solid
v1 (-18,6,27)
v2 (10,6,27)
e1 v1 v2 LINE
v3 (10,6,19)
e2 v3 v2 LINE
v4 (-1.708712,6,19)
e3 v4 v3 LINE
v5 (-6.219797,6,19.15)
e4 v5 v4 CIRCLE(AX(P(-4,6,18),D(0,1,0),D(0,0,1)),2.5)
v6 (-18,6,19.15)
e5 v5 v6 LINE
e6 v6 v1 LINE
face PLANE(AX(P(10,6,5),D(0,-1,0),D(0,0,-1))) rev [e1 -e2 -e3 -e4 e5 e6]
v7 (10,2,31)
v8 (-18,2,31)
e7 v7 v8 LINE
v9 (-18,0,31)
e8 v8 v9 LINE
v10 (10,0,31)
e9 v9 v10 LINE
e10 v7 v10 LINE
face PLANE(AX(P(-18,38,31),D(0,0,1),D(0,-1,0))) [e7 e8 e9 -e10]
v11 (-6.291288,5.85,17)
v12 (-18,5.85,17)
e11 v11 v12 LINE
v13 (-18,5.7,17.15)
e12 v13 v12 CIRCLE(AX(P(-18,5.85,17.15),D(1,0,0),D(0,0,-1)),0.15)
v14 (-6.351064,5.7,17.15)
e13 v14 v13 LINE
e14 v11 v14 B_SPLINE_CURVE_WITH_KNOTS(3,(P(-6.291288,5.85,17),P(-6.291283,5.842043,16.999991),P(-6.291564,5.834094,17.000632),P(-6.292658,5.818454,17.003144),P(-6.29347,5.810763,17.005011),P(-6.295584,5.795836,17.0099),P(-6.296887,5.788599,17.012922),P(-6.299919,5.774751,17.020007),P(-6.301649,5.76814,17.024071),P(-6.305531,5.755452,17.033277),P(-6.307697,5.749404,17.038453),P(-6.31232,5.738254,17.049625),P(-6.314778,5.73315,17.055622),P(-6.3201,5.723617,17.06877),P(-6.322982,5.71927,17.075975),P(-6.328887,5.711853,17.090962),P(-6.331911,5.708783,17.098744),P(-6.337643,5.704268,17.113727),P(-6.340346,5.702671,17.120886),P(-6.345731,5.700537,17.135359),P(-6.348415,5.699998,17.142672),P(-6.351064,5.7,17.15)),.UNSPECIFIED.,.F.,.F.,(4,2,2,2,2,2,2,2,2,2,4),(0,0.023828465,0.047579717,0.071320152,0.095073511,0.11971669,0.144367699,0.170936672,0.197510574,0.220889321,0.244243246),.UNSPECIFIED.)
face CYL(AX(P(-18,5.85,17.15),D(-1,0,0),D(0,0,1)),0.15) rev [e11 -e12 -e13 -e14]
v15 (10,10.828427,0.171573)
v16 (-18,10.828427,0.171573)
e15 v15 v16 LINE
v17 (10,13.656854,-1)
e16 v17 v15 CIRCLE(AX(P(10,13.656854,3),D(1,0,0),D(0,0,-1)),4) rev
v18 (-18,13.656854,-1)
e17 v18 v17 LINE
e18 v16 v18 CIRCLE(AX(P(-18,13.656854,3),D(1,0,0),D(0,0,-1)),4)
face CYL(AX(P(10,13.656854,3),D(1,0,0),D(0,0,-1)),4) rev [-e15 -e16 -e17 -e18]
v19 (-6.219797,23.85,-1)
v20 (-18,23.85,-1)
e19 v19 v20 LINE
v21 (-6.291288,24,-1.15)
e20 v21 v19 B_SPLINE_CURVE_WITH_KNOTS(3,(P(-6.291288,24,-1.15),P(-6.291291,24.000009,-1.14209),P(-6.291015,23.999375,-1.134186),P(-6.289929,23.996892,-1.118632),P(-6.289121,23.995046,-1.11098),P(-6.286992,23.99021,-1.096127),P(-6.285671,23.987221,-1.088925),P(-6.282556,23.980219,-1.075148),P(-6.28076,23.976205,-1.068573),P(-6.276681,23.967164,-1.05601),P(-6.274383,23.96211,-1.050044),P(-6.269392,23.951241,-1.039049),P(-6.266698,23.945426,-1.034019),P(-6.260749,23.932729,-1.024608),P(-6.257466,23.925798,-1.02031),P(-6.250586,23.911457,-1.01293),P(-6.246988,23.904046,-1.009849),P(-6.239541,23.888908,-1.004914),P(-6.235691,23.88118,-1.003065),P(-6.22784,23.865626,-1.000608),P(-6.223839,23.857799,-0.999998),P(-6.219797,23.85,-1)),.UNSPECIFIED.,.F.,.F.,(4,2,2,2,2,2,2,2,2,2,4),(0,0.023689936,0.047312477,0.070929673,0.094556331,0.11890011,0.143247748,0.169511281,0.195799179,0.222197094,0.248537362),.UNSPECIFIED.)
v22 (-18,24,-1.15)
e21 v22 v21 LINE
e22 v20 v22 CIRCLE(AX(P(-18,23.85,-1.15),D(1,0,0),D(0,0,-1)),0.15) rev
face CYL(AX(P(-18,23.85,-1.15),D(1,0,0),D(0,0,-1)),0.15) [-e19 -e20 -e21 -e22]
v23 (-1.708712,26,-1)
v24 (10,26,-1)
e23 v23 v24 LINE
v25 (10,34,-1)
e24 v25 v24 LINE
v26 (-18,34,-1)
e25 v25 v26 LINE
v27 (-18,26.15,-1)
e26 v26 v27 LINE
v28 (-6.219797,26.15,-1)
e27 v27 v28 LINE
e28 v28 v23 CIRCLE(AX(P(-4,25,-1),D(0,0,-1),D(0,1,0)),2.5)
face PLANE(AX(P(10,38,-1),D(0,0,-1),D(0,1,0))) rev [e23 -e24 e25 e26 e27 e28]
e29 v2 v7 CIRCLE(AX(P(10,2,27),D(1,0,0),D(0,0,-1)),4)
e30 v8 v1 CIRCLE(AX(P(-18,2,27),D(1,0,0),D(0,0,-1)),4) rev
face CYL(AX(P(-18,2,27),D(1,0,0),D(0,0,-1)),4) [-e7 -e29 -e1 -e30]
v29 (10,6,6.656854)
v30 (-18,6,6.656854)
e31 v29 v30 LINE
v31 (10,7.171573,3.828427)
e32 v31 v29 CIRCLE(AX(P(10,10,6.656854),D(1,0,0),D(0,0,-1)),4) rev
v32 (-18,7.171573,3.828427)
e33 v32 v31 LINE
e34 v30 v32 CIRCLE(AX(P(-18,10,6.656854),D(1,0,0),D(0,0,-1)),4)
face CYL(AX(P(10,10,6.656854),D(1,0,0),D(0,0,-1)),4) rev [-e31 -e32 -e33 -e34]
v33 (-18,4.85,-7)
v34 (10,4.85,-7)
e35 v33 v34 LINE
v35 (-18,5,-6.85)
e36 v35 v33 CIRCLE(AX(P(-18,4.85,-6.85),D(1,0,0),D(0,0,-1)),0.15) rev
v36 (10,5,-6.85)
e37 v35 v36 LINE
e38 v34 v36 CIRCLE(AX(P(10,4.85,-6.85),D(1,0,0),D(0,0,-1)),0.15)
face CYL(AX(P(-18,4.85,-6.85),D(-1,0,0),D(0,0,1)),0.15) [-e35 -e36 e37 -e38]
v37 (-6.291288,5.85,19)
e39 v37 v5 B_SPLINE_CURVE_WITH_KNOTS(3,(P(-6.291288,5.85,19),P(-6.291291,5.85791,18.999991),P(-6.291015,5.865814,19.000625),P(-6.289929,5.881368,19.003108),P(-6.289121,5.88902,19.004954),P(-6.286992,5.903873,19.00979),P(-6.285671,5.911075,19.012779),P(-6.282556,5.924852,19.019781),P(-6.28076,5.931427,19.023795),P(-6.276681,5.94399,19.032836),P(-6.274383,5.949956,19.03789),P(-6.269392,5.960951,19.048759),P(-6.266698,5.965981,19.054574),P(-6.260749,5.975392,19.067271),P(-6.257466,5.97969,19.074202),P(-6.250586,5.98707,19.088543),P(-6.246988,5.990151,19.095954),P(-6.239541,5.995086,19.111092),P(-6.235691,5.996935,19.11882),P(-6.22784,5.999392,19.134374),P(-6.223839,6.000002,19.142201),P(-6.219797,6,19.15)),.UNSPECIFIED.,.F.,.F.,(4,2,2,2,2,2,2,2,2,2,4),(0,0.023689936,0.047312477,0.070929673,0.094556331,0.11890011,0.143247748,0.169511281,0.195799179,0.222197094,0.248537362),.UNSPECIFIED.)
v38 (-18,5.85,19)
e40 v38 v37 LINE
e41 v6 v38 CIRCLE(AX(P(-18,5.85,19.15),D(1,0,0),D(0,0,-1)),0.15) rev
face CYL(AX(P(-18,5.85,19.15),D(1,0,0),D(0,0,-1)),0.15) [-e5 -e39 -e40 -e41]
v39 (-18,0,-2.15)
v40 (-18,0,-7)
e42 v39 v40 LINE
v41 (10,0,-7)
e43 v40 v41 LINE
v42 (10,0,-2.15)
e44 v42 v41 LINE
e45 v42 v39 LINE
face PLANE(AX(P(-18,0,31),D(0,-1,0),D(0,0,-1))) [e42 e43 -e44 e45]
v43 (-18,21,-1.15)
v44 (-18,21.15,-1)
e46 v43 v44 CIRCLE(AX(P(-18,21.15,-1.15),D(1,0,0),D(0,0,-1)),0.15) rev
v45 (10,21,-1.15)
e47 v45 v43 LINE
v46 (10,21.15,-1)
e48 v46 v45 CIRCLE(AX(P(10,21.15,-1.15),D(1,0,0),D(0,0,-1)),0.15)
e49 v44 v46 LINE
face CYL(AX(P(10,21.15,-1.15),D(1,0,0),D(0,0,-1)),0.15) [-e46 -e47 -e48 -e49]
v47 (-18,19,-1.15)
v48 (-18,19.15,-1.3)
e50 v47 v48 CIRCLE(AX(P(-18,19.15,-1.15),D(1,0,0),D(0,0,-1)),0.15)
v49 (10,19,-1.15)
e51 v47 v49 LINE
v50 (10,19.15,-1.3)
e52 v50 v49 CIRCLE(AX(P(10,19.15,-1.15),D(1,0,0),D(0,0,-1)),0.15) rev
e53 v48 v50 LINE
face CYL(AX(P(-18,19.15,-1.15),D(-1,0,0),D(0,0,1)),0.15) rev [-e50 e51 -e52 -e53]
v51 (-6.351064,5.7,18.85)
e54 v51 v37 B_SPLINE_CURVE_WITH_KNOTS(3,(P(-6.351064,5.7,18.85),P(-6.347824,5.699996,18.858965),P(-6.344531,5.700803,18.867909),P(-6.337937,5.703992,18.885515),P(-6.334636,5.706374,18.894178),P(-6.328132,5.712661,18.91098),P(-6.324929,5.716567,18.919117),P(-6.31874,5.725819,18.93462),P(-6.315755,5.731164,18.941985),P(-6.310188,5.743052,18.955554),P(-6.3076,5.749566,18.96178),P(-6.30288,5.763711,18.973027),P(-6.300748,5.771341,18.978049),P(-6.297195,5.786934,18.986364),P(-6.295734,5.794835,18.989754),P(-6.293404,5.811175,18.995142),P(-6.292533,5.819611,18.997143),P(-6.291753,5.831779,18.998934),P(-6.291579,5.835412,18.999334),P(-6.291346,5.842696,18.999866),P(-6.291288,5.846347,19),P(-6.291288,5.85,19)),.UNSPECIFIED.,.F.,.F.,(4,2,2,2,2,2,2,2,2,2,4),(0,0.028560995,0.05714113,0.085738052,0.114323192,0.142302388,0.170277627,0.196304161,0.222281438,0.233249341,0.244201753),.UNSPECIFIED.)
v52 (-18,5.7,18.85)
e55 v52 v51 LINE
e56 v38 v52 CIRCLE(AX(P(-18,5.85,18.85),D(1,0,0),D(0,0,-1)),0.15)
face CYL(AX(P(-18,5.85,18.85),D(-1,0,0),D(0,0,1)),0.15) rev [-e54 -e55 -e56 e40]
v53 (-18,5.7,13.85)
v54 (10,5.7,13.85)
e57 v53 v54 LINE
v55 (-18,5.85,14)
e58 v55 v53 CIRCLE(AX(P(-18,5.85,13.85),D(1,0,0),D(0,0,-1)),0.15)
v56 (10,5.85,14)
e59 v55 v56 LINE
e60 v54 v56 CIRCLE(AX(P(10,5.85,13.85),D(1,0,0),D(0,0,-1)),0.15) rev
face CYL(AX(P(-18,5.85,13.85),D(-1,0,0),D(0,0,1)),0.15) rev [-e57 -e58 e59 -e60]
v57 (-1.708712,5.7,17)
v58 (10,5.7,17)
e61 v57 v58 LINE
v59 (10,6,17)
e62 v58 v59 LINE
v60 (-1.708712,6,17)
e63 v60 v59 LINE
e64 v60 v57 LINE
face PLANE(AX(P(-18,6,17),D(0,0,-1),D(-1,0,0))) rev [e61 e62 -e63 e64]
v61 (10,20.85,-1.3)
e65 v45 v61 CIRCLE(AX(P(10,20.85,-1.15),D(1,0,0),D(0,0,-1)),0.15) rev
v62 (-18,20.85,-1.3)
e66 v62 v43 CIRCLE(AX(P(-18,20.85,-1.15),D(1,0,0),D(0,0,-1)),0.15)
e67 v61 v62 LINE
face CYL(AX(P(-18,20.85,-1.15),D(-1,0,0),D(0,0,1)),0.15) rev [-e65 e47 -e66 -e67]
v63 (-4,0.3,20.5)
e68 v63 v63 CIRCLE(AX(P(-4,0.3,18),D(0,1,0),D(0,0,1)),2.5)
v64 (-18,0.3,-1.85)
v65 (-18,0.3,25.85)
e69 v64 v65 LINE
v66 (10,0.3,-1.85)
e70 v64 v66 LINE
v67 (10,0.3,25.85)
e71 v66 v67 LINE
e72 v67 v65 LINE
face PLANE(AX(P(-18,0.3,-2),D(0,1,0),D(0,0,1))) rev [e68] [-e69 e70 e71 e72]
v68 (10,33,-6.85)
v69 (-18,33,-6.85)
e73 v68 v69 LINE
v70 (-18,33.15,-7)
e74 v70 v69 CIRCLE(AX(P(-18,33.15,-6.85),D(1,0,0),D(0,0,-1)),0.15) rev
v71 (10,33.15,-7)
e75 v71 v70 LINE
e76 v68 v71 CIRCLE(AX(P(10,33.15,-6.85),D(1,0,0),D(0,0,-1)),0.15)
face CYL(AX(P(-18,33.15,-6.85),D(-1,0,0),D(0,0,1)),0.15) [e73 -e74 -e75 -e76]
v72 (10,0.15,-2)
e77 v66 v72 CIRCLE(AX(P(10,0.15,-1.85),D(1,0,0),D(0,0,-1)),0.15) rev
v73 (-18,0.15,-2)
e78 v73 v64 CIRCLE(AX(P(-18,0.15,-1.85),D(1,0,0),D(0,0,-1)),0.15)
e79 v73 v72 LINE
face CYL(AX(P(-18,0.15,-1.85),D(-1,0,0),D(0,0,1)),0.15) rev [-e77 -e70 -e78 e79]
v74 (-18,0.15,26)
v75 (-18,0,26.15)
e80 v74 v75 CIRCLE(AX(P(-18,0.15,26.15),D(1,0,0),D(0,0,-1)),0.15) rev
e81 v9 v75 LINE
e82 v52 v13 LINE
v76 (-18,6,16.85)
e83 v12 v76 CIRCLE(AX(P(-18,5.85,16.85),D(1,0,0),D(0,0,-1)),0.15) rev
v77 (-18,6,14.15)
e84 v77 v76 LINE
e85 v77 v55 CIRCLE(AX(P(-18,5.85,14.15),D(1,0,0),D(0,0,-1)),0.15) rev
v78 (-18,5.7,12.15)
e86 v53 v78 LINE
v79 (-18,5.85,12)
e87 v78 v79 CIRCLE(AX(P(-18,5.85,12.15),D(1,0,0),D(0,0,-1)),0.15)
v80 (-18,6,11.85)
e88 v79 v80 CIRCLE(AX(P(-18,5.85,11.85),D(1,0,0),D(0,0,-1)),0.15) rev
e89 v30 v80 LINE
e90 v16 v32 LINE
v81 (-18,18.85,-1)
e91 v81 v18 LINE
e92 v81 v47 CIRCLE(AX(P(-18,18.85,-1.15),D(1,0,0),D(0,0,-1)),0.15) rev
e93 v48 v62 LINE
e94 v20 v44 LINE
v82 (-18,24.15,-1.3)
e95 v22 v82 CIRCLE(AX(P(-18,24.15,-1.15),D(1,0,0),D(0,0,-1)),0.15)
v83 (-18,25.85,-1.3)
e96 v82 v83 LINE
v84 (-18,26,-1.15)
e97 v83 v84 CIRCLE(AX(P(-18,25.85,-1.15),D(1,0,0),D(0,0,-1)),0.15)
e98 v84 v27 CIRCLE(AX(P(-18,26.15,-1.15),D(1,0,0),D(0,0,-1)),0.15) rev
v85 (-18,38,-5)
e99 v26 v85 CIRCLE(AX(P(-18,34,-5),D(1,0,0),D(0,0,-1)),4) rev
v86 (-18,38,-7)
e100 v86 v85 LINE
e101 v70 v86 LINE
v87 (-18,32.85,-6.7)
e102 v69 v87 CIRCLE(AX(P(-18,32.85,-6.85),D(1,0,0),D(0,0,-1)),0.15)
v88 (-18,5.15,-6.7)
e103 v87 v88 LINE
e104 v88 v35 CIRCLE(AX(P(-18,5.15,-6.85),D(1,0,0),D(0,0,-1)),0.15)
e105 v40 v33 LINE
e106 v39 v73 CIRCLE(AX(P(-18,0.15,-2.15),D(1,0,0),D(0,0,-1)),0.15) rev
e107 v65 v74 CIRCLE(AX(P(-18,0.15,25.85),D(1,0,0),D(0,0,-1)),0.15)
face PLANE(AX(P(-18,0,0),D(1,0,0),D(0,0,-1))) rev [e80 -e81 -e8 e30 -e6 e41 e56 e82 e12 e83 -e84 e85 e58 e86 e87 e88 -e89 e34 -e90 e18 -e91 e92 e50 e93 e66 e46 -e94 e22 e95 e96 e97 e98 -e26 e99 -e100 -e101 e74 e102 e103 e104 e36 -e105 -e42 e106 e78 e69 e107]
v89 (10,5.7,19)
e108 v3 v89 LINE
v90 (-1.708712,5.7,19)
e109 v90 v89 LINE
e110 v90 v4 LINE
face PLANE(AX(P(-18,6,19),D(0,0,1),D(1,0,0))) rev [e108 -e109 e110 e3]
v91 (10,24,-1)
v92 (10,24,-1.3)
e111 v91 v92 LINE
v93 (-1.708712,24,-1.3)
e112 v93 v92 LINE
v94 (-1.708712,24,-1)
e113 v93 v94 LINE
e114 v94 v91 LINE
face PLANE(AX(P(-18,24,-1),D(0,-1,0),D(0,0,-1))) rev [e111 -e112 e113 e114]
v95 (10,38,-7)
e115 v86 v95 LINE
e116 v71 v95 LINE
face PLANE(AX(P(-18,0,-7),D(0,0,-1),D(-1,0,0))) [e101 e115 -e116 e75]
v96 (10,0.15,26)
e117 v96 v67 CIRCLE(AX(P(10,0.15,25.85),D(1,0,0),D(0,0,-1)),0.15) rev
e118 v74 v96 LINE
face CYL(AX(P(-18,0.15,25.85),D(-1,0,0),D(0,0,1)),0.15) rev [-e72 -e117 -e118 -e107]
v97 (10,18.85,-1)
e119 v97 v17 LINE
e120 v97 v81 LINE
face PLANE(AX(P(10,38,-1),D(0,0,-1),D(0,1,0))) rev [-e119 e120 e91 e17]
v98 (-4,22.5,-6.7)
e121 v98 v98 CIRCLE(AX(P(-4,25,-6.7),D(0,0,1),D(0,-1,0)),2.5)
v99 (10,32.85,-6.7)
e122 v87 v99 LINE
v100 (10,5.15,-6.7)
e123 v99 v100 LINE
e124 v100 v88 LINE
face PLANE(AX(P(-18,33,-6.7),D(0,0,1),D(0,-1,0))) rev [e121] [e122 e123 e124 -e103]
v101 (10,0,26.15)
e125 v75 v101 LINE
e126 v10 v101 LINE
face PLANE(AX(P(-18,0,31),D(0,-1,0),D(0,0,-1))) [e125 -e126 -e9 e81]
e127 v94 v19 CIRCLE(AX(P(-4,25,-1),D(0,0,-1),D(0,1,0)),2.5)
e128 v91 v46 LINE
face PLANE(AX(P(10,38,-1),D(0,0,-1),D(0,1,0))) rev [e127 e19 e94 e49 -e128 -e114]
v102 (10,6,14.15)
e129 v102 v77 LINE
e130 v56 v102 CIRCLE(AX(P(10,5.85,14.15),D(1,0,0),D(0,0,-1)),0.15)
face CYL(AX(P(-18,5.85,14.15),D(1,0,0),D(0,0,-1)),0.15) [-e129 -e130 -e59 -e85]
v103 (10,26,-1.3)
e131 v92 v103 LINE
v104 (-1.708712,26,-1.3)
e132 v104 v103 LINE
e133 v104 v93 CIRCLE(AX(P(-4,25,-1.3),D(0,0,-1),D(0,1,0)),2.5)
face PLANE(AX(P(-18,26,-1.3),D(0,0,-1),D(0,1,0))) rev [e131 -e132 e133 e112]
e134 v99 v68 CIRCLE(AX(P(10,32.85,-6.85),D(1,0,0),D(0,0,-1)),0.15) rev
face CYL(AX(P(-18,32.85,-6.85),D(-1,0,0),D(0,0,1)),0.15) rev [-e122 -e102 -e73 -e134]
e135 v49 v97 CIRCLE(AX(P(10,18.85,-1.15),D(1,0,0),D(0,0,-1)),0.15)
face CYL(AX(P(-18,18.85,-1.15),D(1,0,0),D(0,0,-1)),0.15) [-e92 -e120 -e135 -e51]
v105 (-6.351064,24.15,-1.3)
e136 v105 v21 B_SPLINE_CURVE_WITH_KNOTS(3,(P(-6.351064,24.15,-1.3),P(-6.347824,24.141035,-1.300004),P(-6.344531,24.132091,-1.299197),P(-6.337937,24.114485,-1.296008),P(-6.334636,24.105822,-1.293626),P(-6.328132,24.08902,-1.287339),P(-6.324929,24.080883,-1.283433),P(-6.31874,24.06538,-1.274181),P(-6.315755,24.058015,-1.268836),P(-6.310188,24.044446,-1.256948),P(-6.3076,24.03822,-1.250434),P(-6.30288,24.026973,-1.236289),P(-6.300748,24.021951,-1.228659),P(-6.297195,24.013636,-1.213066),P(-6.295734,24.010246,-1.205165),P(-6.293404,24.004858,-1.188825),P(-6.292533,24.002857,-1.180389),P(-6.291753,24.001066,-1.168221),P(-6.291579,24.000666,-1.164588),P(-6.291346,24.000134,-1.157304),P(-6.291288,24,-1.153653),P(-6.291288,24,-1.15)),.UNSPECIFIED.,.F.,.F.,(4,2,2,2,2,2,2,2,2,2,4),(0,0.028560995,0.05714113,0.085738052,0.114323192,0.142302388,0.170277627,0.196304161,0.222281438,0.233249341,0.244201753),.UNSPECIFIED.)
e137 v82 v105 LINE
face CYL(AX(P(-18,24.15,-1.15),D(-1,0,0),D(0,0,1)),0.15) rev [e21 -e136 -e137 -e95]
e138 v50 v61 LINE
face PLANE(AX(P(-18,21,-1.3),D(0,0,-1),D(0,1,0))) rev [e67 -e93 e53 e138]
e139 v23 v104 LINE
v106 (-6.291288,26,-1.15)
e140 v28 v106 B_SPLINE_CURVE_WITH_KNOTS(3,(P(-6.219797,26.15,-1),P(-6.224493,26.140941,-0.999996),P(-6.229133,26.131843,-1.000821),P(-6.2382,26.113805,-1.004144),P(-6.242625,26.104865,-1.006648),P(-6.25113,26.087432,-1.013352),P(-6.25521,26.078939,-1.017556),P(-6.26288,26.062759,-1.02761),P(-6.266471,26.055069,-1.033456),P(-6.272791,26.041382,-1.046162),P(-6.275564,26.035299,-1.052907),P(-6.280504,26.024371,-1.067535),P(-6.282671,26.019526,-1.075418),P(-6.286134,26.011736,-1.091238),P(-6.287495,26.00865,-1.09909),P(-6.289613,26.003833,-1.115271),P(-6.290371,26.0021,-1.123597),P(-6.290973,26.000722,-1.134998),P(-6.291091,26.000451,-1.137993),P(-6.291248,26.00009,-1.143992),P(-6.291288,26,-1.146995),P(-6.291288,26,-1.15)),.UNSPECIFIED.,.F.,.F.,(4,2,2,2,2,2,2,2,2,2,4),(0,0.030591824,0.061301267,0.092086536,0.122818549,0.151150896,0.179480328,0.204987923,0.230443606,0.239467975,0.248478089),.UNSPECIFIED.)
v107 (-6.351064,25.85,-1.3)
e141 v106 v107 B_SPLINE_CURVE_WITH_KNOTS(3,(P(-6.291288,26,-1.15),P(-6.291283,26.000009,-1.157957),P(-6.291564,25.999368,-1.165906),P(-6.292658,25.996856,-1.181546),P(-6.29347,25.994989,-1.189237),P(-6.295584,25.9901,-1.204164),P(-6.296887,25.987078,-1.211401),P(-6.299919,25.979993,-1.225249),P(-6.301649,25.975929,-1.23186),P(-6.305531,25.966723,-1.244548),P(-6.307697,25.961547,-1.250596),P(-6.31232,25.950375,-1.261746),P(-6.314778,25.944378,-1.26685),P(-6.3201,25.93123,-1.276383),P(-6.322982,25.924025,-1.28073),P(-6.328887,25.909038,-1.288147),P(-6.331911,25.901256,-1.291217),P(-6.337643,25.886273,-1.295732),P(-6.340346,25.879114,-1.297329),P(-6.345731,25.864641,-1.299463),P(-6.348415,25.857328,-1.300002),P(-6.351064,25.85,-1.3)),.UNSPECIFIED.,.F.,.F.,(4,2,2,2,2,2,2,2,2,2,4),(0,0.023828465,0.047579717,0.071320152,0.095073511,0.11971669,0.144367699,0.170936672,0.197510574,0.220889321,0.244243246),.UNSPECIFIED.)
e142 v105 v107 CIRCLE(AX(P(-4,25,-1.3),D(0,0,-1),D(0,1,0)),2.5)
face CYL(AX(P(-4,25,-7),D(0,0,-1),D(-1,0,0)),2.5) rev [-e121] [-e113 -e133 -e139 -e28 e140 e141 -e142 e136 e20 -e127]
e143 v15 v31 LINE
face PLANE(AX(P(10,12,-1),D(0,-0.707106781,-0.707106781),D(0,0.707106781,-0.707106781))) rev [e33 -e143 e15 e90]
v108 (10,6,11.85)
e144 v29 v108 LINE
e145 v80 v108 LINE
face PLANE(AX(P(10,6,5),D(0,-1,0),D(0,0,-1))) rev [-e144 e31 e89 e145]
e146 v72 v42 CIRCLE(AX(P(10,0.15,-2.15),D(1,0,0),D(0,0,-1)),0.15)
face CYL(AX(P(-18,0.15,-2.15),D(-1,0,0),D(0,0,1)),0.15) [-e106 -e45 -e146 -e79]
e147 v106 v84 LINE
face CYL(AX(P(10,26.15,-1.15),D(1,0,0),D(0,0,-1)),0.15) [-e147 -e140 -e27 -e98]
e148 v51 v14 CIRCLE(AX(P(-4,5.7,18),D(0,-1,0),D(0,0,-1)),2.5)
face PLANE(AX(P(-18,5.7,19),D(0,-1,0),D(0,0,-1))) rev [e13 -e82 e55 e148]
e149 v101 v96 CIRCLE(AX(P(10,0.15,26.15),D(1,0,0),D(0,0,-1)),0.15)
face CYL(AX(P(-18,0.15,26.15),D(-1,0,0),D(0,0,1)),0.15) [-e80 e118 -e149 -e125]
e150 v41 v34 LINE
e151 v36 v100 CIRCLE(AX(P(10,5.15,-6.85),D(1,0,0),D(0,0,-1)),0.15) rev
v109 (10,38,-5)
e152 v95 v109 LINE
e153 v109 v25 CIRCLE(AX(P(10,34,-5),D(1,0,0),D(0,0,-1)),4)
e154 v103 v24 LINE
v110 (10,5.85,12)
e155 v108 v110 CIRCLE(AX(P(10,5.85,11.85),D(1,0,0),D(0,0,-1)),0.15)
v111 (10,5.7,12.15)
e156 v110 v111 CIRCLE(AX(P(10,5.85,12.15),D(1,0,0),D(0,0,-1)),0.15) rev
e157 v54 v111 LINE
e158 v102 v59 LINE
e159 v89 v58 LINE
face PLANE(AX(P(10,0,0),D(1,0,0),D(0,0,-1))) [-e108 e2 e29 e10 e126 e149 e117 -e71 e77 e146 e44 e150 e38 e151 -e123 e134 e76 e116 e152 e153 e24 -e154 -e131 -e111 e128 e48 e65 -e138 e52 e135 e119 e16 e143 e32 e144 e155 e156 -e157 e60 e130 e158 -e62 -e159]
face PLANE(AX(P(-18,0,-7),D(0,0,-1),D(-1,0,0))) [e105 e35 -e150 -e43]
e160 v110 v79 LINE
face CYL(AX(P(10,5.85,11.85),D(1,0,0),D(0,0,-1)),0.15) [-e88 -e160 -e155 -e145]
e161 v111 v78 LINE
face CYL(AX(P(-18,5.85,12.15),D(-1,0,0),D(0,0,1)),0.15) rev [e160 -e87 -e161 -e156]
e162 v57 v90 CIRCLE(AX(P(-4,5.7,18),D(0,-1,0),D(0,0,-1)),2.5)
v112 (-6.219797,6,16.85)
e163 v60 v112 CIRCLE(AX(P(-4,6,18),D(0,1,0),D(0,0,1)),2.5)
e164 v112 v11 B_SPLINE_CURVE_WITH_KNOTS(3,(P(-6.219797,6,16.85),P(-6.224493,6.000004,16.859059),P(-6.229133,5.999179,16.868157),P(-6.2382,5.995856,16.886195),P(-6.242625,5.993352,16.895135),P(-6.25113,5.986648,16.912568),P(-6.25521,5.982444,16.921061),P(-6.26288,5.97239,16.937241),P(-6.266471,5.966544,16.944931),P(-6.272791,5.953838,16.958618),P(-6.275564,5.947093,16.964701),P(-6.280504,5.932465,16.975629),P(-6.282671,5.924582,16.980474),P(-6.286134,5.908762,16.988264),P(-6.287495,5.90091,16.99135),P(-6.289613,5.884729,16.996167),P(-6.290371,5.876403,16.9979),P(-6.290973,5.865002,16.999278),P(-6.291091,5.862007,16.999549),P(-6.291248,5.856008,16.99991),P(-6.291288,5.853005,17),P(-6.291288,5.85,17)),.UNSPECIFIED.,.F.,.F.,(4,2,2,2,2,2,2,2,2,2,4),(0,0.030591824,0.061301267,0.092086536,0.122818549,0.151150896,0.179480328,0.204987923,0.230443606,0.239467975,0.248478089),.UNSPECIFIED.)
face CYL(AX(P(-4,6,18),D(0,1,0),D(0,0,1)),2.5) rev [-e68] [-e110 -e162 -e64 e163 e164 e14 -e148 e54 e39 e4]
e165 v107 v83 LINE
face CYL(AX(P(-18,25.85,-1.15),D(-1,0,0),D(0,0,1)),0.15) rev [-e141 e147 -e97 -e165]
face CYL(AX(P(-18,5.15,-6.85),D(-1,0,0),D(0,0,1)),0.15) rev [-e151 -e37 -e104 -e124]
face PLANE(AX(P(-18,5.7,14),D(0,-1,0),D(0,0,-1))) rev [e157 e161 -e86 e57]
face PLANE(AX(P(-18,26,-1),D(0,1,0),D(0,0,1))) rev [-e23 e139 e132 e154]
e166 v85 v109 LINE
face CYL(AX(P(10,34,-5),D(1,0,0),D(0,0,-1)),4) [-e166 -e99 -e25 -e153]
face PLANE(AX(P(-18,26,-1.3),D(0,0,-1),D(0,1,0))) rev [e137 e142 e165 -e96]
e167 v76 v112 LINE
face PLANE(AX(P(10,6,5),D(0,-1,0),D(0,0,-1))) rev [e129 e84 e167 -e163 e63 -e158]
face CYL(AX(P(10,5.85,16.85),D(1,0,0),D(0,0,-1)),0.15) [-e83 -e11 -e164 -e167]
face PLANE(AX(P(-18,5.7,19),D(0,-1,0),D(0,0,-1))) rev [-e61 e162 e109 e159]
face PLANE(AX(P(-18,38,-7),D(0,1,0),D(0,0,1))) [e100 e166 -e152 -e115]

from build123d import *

# Parameters (mm, degrees)
ESBO_O1_W                  = 38
ESBO_O1_H                  = 38
RESSALTO_EXTRUS_O1_DEPTH   = 28
CORTE_EXTRUS_O1_DEPTH      = 57.471231614
ESBO_O7_W                  = 0.3
ESBO_O7_H                  = 28
ESBO_O7_W_2                = 28
ESBO_O7_H_2                = 0.3
ESBO_O7_W_3                = 2
ESBO_O7_H_3                = 2
CORTE_EXTRUS_O2_DEPTH      = 57.471231614
FURO_DE_DI_METRO_7_0_7_3_D = 5
FURO_DE_DI_METRO_7_0_7_2_D = 5
FILETE1_R                  = 4
FILETE2_R                  = 0.15


with BuildPart() as part:
    # Esboço1 → Ressalto-extrusão1 (new body)
    with BuildSketch(Plane(origin=(10, 0, 0), x_dir=(0, 0, -1), z_dir=(1, 0, 0))):
        with Locations((-12, 19)):
            Rectangle(ESBO_O1_W, ESBO_O1_H)
    extrude(amount=-RESSALTO_EXTRUS_O1_DEPTH)

    # Esboço2 → Corte-extrusão1 (cut, through all)
    with BuildSketch(Plane.ZY.offset(18)):
        Polygon((31, 38), (-1, 38), (-1, 12), (5, 6), (31, 6), align=None)
    extrude(amount=-CORTE_EXTRUS_O1_DEPTH, mode=Mode.SUBTRACT)

    # Esboço7 → Corte-extrusão2 (cut, through all)
    with BuildSketch(Plane(origin=(10, 0, 0), x_dir=(0, 0, -1), z_dir=(1, 0, 0))):
        with Locations((6.85, 19)):
            Rectangle(ESBO_O7_W, ESBO_O7_H)
        with Locations((-12, 0.15)):
            Rectangle(ESBO_O7_W_2, ESBO_O7_H_2)
        with Locations((-13, 5.85)):
            Rectangle(ESBO_O7_W_3, ESBO_O7_H_2)
        with Locations((1.15, 20)):
            Rectangle(ESBO_O7_W, ESBO_O7_H_3)
        with Locations((-18, 5.85)):
            Rectangle(ESBO_O7_W_3, ESBO_O7_H_2)
        with Locations((1.15, 25)):
            Rectangle(ESBO_O7_W, ESBO_O7_H_3)
    extrude(amount=-CORTE_EXTRUS_O2_DEPTH, mode=Mode.SUBTRACT)

    # Furo de diâmetro Ø7.0 (7)3 (through all)
    with Locations(Plane(origin=(0, 6, 0), x_dir=(1, 0, 0), z_dir=(0, 1, 0))):
        with Locations((-4, -18)):
            Hole(FURO_DE_DI_METRO_7_0_7_3_D / 2)

    # Furo de diâmetro Ø7.0 (7)2 (through all)
    with Locations(Plane(origin=(0, 0, -7), x_dir=(-1, 0, 0), z_dir=(0, 0, -1))):
        with Locations((4, 25)):
            Hole(FURO_DE_DI_METRO_7_0_7_2_D / 2)

    # Filete1
    filete1_edges = [part.edges().sort_by_distance(p)[0] for p in [
        (-4, 6, 31),
        (-4, 6, 5),
        (-4, 12, -1),
        (-4, 38, -1),
    ]]
    fillet(filete1_edges, radius=FILETE1_R)

    # Filete2
    filete2_edges = [part.edges().sort_by_distance(p)[0] for p in [
        (-4, 5, -7),
        (-4, 5, -6.7),
        (-4, 33, -7),
        (-4, 33, -6.7),
        (-4, 0, 26),
        (-4, 0.3, 26),
        (-4, 0.3, -2),
        (-4, 0, -2),
        (-4, 19, -1.3),
        (-4, 19, -1),
        (-4, 21, -1.3),
        (-4, 21, -1),
        (-4, 5.7, 14),
        (-4, 6, 14),
        (-4, 5.7, 12),
        (-4, 6, 12),
        (-12.145643924, 26, -1.3),
        (-12.145643924, 24, -1.3),
        (-12.145643924, 24, -1),
        (-12.145643924, 26, -1),
        (-12.145643924, 5.7, 19),
        (-12.145643924, 5.7, 17),
        (-12.145643924, 6, 17),
        (-12.145643924, 6, 19),
    ]]
    fillet(filete2_edges, radius=FILETE2_R - 0.0001)  # a hair under: the kernel refuses the full size


solid = part.part
